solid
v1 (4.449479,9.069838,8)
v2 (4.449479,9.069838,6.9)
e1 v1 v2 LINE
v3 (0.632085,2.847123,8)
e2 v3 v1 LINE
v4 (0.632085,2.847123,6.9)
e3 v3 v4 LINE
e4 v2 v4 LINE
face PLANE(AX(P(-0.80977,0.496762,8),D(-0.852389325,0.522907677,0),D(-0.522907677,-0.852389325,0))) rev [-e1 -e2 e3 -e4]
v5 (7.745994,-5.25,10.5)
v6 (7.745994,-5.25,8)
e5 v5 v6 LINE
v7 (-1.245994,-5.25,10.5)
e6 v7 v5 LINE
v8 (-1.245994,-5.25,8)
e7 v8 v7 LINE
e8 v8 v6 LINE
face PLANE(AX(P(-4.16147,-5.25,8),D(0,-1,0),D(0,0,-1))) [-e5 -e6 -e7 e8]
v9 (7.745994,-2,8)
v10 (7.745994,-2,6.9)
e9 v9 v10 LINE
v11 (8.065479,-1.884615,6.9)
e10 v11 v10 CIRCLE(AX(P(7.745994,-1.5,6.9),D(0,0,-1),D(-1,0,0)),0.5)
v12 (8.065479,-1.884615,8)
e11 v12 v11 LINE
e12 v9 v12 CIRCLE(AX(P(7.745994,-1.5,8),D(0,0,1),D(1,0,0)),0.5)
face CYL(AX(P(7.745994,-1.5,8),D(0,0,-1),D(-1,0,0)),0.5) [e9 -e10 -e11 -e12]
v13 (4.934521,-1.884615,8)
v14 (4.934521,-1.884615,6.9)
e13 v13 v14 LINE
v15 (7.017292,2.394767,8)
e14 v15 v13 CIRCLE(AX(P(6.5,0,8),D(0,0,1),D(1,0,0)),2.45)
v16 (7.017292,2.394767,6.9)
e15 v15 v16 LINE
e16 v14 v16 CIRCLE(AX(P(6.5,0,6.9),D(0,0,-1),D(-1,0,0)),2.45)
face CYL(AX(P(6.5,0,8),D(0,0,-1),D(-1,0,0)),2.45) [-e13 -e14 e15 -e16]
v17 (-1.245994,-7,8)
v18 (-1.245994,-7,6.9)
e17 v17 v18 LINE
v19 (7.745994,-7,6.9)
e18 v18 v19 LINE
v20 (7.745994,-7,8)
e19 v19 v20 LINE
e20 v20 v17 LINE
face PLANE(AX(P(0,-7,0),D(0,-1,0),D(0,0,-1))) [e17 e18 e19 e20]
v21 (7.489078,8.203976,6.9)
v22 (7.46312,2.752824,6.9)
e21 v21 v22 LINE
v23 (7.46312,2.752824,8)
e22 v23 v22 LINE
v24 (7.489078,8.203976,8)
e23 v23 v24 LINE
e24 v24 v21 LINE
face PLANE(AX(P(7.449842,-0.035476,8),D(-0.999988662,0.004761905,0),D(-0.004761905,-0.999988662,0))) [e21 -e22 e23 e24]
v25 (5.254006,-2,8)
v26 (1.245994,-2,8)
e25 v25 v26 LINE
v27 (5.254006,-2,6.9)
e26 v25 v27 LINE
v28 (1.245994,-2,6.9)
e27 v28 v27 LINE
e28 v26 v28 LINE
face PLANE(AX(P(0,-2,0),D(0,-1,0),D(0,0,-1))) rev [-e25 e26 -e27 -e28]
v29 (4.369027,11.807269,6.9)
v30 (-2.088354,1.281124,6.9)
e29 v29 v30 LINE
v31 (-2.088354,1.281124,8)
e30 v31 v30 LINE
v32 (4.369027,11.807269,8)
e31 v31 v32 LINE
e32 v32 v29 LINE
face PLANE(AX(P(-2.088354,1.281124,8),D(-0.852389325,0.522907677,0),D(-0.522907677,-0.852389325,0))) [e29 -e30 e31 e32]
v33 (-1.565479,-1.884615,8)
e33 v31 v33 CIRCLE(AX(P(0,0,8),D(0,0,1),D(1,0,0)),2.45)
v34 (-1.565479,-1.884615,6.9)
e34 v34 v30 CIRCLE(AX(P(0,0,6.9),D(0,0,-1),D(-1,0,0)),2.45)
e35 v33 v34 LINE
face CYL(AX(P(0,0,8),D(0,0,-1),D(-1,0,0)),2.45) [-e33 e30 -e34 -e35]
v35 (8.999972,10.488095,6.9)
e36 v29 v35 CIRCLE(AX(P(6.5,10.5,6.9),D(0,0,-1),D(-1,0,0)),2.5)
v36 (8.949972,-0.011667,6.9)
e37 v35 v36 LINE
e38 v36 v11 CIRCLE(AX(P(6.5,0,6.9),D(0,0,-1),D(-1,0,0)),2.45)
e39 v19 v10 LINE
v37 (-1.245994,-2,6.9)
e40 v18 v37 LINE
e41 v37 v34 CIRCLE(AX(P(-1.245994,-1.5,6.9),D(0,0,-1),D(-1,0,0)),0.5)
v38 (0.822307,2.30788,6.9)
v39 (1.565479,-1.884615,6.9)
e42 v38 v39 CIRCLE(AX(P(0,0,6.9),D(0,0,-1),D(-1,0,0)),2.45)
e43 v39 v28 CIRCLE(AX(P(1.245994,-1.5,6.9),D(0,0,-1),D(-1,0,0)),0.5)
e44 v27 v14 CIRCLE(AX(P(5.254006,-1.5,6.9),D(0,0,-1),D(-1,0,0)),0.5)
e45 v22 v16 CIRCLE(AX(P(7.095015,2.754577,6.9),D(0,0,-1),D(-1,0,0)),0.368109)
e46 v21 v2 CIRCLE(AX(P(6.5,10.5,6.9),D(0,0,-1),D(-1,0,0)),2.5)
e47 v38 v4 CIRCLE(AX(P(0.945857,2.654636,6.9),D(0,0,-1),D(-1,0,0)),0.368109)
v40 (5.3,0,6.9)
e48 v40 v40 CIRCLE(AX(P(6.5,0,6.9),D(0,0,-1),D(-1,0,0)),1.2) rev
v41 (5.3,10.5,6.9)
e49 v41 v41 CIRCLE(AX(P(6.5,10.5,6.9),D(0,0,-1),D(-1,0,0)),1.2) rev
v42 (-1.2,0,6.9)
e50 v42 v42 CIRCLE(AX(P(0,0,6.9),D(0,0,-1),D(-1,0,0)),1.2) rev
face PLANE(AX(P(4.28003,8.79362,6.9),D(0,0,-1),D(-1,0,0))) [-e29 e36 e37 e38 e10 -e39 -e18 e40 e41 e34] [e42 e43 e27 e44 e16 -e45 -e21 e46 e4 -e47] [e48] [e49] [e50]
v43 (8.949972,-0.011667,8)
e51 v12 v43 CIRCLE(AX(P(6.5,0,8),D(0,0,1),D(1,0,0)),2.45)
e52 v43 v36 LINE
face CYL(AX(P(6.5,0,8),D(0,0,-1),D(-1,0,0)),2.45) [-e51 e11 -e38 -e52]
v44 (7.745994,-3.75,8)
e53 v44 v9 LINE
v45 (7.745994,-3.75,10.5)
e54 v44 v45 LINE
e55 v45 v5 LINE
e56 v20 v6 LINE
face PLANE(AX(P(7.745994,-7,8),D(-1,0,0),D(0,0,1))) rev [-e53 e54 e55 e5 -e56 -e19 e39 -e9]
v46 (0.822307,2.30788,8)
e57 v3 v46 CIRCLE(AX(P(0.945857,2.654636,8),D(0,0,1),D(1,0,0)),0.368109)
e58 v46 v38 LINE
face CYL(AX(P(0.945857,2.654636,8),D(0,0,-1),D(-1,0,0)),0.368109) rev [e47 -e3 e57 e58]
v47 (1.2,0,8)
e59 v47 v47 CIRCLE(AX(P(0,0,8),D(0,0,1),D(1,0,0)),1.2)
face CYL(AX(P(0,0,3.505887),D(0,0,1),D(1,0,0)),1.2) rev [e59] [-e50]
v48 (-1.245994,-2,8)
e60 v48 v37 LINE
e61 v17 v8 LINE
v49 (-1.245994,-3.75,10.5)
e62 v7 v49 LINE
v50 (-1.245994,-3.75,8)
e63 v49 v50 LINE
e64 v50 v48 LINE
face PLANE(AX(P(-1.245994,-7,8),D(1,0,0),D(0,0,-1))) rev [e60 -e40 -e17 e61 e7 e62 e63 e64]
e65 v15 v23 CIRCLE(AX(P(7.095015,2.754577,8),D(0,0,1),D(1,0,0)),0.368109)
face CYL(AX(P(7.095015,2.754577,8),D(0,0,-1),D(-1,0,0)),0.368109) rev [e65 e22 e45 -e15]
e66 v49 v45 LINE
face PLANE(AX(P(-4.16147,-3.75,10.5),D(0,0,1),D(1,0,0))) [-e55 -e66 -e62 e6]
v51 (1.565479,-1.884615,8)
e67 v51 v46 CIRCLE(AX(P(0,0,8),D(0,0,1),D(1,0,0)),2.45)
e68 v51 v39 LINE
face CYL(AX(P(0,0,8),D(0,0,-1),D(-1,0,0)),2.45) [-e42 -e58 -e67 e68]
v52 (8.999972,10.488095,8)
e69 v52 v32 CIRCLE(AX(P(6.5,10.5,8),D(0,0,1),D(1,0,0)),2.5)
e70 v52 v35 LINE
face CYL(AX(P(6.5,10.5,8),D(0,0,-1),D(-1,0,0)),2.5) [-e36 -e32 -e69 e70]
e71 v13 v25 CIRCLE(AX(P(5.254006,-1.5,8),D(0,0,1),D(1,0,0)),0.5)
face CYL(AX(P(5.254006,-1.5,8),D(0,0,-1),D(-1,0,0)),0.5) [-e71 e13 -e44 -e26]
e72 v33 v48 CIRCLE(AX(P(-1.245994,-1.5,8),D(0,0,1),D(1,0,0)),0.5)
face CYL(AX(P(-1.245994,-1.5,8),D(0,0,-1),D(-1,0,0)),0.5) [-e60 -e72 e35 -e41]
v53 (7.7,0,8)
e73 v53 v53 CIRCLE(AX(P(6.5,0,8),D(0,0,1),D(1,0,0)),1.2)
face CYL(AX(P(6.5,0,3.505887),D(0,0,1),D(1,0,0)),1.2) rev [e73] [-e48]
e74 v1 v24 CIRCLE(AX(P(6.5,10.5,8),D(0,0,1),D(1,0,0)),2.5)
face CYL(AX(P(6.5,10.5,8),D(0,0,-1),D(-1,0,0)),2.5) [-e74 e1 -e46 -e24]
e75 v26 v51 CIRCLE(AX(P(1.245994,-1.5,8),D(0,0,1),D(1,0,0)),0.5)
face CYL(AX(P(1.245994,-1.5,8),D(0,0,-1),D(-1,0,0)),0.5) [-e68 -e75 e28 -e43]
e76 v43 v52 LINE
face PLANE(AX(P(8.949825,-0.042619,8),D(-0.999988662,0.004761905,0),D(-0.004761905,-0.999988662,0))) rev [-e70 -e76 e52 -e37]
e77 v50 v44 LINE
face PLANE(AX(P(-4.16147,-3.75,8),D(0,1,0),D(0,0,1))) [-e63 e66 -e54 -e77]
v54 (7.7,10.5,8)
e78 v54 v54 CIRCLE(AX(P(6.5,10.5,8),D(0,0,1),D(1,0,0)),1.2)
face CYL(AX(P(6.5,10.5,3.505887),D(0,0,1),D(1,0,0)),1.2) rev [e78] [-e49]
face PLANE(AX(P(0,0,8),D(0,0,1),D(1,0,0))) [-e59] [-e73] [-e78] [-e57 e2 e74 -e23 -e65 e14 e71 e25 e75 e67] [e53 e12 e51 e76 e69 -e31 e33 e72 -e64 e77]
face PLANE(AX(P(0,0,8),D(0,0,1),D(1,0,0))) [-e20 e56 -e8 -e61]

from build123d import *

# Parameters (mm, degrees)
STOCK_BASE_SKEWED_1_START     = 6.9
STOCK_BASE_SKEWED_1_OUTLINE_R = 1.2
STOCK_BASE_SKEWED_1_DEPTH     = 1.1
SKETCH1_W                     = 2.5
SKETCH1_H                     = 1.5
BOSS_EXTRUDE1_DEPTH           = 8.991987159


# Read off the part's stored shape, not the designer's step: Stock-Base_skewed-1
with BuildPart() as part:
    # Stock-Base_skewed-1 outline → Stock-Base_skewed-1 (new body)
    with BuildSketch(Plane.XY.offset(STOCK_BASE_SKEWED_1_START)):
        with BuildLine():
            ThreePointArc((8.999971655, 10.488095238), (7.184905048, 12.904351279), (4.369026688, 11.807269193))
            Line((4.369026688, 11.807269193), (-2.088353846, 1.281123809))
            ThreePointArc((-2.088353846, 1.281123809), (-2.417250501, -0.399249317), (-1.565479113, -1.884615385))
            ThreePointArc((-1.565479113, -1.884615385), (-1.415835135, -1.970269972), (-1.245993579, -2))
            Line((-1.245993579, -2), (-1.245993579, -7))
            Line((-1.245993579, -7), (7.745993579, -7))
            Line((7.745993579, -7), (7.745993579, -2))
            ThreePointArc((7.745993579, -2), (7.915835135, -1.970269972), (8.065479113, -1.884615385))
            ThreePointArc((8.065479113, -1.884615385), (8.715388585, -1.046209071), (8.949972222, -0.011666667))
            Line((8.949972222, -0.011666667), (8.999971655, 10.488095238))
        make_face()
        Circle(STOCK_BASE_SKEWED_1_OUTLINE_R, mode=Mode.SUBTRACT)
        with Locations((6.5, 0)):
            Circle(STOCK_BASE_SKEWED_1_OUTLINE_R, mode=Mode.SUBTRACT)
        with BuildLine():
            Line((0.632085047, 2.847123137), (4.449478669, 9.069838376))
            ThreePointArc((4.449478669, 9.069838376), (5.815094952, 8.095648721), (7.489077768, 8.203976226))
            Line((7.489077768, 8.203976226), (7.463119607, 2.75282442))
            ThreePointArc((7.463119607, 2.75282442), (7.325518036, 2.467571215), (7.017292273, 2.394766941))
            ThreePointArc((7.017292273, 2.394766941), (4.297058288, 1.072169676), (4.934520887, -1.884615385))
            ThreePointArc((4.934520887, -1.884615385), (5.084164865, -1.970269972), (5.254006421, -2))
            Line((5.254006421, -2), (1.245993579, -2))
            ThreePointArc((1.245993579, -2), (1.415835135, -1.970269972), (1.565479113, -1.884615385))
            ThreePointArc((1.565479113, -1.884615385), (2.412392059, 0.427626653), (0.822306837, 2.307880297))
            ThreePointArc((0.822306837, 2.307880297), (0.598713954, 2.532178772), (0.632085047, 2.847123137))
        make_face(mode=Mode.SUBTRACT)
        with Locations((6.5, 10.5)):
            Circle(STOCK_BASE_SKEWED_1_OUTLINE_R, mode=Mode.SUBTRACT)
    extrude(amount=STOCK_BASE_SKEWED_1_DEPTH)

    # Sketch1 → Boss-Extrude1 (add)
    with BuildSketch(Plane(origin=(7.745993579, 0, 0), x_dir=(0, 0, -1), z_dir=(1, 0, 0))):
        with Locations((-9.25, -4.5)):
            Rectangle(SKETCH1_W, SKETCH1_H)
    extrude(amount=-BOSS_EXTRUDE1_DEPTH)


solid = part.part
